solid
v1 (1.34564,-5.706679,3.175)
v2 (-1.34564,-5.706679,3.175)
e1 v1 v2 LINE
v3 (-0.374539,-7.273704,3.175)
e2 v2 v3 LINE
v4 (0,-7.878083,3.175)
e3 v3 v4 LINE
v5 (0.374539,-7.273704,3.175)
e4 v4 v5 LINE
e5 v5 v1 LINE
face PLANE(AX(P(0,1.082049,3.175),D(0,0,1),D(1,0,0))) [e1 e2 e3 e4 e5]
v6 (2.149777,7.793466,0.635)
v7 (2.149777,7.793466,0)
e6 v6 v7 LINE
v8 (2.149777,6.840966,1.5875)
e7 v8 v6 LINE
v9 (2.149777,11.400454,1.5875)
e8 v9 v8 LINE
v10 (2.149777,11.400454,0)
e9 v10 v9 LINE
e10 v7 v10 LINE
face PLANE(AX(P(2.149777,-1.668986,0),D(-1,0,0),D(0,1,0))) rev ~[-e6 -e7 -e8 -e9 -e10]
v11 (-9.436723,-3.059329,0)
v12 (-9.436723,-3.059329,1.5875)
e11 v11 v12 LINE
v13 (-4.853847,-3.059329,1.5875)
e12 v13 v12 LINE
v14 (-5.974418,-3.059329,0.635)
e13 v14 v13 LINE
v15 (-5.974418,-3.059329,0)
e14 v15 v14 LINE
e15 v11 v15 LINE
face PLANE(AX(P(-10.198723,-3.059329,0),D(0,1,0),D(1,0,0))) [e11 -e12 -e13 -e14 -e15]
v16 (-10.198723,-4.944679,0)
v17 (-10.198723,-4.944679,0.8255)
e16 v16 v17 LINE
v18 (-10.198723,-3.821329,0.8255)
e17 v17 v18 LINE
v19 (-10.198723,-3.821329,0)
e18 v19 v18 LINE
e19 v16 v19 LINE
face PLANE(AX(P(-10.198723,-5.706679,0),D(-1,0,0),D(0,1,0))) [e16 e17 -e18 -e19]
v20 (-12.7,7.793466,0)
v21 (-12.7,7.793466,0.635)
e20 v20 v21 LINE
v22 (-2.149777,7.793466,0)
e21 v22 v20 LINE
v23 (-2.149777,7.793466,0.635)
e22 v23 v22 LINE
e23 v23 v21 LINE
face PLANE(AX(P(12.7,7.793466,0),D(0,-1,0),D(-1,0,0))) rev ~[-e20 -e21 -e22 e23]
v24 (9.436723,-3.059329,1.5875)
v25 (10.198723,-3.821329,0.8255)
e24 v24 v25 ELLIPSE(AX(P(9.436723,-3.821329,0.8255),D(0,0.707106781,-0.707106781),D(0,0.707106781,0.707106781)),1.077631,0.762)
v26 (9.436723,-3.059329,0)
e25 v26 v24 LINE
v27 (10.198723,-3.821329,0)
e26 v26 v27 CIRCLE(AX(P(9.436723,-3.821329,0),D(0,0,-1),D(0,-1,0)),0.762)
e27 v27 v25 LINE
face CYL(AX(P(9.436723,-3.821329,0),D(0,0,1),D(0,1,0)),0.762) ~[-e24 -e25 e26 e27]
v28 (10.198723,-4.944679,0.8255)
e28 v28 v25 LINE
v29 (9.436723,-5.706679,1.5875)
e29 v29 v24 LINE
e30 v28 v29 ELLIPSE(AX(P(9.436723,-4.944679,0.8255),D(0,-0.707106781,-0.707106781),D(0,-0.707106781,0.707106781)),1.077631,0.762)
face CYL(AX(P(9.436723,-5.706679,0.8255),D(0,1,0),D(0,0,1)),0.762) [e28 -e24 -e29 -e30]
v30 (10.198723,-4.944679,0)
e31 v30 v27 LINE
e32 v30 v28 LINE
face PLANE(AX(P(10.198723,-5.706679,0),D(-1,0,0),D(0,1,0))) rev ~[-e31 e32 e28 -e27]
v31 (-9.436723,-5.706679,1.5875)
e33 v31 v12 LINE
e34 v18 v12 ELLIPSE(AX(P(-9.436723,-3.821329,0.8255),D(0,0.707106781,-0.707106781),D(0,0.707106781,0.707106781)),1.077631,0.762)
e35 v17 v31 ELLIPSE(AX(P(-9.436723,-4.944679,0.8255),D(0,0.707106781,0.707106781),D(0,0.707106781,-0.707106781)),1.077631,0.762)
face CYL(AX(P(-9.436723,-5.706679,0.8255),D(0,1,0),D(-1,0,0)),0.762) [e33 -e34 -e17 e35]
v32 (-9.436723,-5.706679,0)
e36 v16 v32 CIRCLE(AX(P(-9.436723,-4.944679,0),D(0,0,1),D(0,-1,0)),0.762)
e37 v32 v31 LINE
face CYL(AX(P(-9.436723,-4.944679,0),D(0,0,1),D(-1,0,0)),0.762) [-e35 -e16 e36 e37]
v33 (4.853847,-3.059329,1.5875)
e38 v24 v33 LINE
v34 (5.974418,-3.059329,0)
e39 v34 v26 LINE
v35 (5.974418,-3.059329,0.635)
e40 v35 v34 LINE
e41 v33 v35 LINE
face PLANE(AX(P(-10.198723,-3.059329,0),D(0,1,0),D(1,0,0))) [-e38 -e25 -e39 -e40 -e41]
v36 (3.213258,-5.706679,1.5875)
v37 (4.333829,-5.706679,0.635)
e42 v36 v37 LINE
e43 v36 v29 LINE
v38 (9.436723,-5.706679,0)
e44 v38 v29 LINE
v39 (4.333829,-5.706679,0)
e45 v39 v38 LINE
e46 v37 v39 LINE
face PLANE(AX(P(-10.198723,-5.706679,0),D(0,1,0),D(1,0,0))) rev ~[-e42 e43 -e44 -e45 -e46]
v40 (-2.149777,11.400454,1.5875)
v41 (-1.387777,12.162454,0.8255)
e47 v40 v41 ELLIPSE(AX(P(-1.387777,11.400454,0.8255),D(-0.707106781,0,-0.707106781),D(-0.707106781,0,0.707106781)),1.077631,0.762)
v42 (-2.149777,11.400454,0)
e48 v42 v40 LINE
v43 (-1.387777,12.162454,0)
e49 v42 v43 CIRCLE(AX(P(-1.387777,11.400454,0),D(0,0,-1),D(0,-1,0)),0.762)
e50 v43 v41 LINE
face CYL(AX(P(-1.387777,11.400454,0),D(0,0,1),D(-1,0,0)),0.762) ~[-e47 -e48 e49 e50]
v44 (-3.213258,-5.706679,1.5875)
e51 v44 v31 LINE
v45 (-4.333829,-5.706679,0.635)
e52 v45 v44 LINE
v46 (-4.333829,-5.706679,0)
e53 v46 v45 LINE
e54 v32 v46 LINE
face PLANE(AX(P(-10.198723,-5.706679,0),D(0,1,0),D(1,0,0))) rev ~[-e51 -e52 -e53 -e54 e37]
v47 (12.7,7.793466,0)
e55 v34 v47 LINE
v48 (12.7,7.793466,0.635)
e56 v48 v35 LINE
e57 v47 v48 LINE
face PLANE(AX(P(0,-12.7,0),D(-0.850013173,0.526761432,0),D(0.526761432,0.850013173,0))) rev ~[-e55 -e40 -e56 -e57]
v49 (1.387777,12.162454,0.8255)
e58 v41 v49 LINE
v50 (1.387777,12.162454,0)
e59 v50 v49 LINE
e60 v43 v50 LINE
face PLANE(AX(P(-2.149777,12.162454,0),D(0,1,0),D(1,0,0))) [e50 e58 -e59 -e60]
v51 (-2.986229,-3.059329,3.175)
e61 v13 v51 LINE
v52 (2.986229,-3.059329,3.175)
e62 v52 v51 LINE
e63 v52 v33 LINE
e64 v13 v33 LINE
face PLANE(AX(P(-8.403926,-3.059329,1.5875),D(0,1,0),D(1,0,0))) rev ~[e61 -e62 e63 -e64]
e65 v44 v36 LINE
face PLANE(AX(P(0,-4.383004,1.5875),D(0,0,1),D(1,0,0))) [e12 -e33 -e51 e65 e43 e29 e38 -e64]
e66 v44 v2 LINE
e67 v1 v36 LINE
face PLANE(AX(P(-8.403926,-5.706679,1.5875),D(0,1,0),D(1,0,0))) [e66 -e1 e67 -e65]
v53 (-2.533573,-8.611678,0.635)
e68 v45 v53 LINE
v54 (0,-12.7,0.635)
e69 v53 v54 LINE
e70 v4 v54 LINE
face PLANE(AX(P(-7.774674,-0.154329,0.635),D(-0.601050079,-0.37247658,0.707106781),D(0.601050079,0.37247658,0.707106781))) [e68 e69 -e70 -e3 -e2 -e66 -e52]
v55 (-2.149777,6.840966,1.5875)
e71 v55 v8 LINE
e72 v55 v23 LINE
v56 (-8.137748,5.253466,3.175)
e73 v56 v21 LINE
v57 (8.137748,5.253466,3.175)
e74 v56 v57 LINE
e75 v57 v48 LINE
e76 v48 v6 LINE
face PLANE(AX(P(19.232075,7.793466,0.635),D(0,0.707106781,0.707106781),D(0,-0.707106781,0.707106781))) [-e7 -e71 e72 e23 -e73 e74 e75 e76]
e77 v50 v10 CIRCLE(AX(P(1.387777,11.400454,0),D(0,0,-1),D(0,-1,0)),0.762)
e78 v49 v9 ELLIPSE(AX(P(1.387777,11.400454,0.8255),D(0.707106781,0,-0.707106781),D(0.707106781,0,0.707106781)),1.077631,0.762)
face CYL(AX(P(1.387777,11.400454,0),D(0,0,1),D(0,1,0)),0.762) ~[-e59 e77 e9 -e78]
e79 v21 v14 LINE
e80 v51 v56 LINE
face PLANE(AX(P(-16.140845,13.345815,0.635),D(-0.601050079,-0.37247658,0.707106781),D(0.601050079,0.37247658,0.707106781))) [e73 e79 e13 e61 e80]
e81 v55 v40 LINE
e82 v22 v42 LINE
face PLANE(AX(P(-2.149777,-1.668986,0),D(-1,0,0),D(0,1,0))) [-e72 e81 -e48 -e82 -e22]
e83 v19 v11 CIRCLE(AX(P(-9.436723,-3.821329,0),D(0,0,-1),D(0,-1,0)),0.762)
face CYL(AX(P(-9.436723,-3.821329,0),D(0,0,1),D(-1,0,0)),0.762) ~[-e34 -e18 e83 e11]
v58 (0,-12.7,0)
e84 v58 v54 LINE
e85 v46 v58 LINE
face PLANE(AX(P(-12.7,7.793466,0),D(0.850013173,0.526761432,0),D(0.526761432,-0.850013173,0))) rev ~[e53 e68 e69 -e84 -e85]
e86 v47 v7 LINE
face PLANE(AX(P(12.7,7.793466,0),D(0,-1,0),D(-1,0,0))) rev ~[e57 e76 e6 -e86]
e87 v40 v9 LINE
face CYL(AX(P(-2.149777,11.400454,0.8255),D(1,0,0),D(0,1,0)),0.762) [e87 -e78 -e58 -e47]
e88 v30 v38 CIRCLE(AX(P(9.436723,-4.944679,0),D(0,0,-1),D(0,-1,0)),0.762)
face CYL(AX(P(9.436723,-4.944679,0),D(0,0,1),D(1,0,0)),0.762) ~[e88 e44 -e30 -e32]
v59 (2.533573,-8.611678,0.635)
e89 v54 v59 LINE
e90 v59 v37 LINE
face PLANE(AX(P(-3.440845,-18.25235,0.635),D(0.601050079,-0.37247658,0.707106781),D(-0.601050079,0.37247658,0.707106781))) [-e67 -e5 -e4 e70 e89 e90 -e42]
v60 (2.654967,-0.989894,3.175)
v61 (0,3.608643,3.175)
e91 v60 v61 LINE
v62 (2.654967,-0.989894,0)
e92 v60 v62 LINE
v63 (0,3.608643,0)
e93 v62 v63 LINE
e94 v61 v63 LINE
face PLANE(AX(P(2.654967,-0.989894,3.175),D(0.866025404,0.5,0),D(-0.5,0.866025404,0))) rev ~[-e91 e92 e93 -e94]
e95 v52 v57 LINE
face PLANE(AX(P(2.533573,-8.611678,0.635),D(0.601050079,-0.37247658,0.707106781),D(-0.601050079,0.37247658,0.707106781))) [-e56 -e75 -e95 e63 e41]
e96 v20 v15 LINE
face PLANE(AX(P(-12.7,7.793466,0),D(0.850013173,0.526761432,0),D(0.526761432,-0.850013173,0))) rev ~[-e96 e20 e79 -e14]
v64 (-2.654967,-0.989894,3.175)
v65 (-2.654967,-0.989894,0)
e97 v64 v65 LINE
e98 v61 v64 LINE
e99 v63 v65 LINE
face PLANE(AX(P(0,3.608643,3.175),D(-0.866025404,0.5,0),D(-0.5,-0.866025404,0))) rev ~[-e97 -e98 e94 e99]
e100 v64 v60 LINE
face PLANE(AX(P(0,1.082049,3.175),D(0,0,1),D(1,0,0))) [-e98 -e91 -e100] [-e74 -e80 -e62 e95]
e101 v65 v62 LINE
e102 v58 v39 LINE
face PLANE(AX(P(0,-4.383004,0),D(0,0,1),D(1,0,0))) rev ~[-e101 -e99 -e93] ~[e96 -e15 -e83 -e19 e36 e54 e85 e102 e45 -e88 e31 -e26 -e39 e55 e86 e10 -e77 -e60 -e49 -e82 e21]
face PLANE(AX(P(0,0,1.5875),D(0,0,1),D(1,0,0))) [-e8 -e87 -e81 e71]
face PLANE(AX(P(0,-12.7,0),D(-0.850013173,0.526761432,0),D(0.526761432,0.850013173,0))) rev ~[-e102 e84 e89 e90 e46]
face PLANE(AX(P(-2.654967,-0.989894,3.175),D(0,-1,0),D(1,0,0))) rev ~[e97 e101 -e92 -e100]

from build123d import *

# Parameters (mm, degrees)
F1_DEPTH     = 3.175
F2_W         = 20.397445187
F2_H         = 2.647349927
F2_W_2       = 4.2995549738
F2_H_2       = 13.8314400401
F3_DEPTH     = 1.5875
F4_W         = 14.3783436368
F4_H         = 2.647349927
F5_DEPTH     = 25.4
F6_T4_DEPTH  = 25.8319450188
F6_T9_DEPTH  = 25.8319450188
F6_T14_DEPTH = 38.4641495789
F6_T19_DEPTH = 38.4641495789
F6_T24_DEPTH = 38.4641495789
F6_T29_DEPTH = 25.8319450188
F6_T34_DEPTH = 25.8319450188
F6_T39_DEPTH = 21.2914590052
F6_T44_DEPTH = 21.2914590052
F6_T49_DEPTH = 21.2914590052
F6_T54_DEPTH = 21.2914590052
F7_R         = 0.762
F9_DEPTH     = 25.4


# Not quite as in the source:
# - a fillet or chamfer that OpenCascade refuses, or shapes differently, is made with other operations: its cross-section is extruded or revolved along the edge and cut away or added


with BuildPart() as f1:
    # F0 (on Top) → F1 (new body)
    with BuildSketch(Plane.XY):
        Polygon((12.7, 7.7934656292), (-12.7, 7.7934656292), (0, -12.7), align=None)
    extrude(amount=F1_DEPTH)

    # F2 (on Top) → F3 (join)
    with BuildSketch(Plane.XY):
        with Locations((0, -4.3830036468)):
            Rectangle(F2_W, F2_H)
        with Locations((0, 5.2467339706)):
            Rectangle(F2_W_2, F2_H_2)
    extrude(amount=F3_DEPTH)

    # F4 (on face) → F5 (cut)
    with BuildSketch(Plane.XY.offset(1.5875)):
        with Locations((-1.2147540241, -4.3830036468)):
            Rectangle(F4_W, F4_H)
    extrude(amount=F5_DEPTH, mode=Mode.SUBTRACT)

    # F6: chamfer of 2.54 on 5 edges, made by hand


with BuildPart() as f6_tool2:
    # F6_s3 → F6_t4 (new body)
    with BuildSketch(Plane(origin=(-10.454367288, 16.8697808418, 0), x_dir=(0, 0, 1), z_dir=(0.5267614317, -0.8500131729, 0))):
        Polygon((0.635, 6.6898701827), (3.175, 4.1498701827), (3.175, 6.6898701827), align=None)
    extrude(amount=F6_T4_DEPTH)

    split(bisect_by=Plane.XZ.offset(3.0593286833), keep=Keep.BOTTOM)


with BuildPart() as f1_1:
    add(f1.part)

    # F6_t1: cut F6_tool2
    add(f6_tool2.part, mode=Mode.SUBTRACT)


with BuildPart() as f6_tool7:
    # F6_s8 → F6_t9 (new body)
    with BuildSketch(Plane(origin=(-10.454367288, 16.8697808418, 0), x_dir=(0, 0, 1), z_dir=(0.5267614317, -0.8500131729, 0))):
        Polygon((0.635, 6.6898701827), (3.175, 4.1498701827), (3.175, 6.6898701827), align=None)
    extrude(amount=F6_T9_DEPTH)

    split(bisect_by=Plane.XZ.offset(5.7066786103), keep=Keep.TOP)


with BuildPart() as f1_2:
    add(f1_1.part)

    # F6_t6: cut F6_tool7
    add(f6_tool7.part, mode=Mode.SUBTRACT)


with BuildPart() as f6_tool12:
    # F6_s13 → F6_t14 (new body)
    with BuildSketch(Plane.YZ.offset(19.2320747894)):
        Polygon((7.7934656292, 0.635), (5.2534656292, 3.175), (7.7934656292, 3.175), align=None)
    extrude(amount=-F6_T14_DEPTH)

    split(bisect_by=Plane.YZ.offset(2.1497774869), keep=Keep.TOP)


with BuildPart() as f1_3:
    add(f1_2.part)

    # F6_t11: cut F6_tool12
    add(f6_tool12.part, mode=Mode.SUBTRACT)


with BuildPart() as f6_tool17:
    # F6_s18 → F6_t19 (new body)
    with BuildSketch(Plane.YZ.offset(19.2320747894)):
        Polygon((7.7934656292, 0.635), (5.2534656292, 3.175), (7.7934656292, 3.175), align=None)
    extrude(amount=-F6_T19_DEPTH)

    split(bisect_by=Plane.XY.offset(1.5875), keep=Keep.TOP)


with BuildPart() as f1_4:
    add(f1_3.part)

    # F6_t16: cut F6_tool17
    add(f6_tool17.part, mode=Mode.SUBTRACT)


with BuildPart() as f6_tool22:
    # F6_s23 → F6_t24 (new body)
    with BuildSketch(Plane.YZ.offset(19.2320747894)):
        Polygon((7.7934656292, 0.635), (5.2534656292, 3.175), (7.7934656292, 3.175), align=None)
    extrude(amount=-F6_T24_DEPTH)

    split(bisect_by=Plane.YZ.offset(-2.1497774869), keep=Keep.BOTTOM)


with BuildPart() as f1_5:
    add(f1_4.part)

    # F6_t21: cut F6_tool22
    add(f6_tool22.part, mode=Mode.SUBTRACT)


with BuildPart() as f6_tool27:
    # F6_s28 → F6_t29 (new body)
    with BuildSketch(Plane(origin=(-3.1529050539, -5.0877127051, 0), x_dir=(0, 0, 1), z_dir=(0.5267614317, 0.8500131729, 0))):
        Polygon((0.635, 6.6898701827), (3.175, 4.1498701827), (3.175, 6.6898701827), align=None)
    extrude(amount=F6_T29_DEPTH)

    split(bisect_by=Plane.XZ.offset(5.7066786103), keep=Keep.TOP)


with BuildPart() as f1_6:
    add(f1_5.part)

    # F6_t26: cut F6_tool27
    add(f6_tool27.part, mode=Mode.SUBTRACT)


with BuildPart() as f6_tool32:
    # F6_s33 → F6_t34 (new body)
    with BuildSketch(Plane(origin=(-3.1529050539, -5.0877127051, 0), x_dir=(0, 0, 1), z_dir=(0.5267614317, 0.8500131729, 0))):
        Polygon((0.635, 6.6898701827), (3.175, 4.1498701827), (3.175, 6.6898701827), align=None)
    extrude(amount=F6_T34_DEPTH)

    split(bisect_by=Plane.XZ.offset(3.0593286833), keep=Keep.BOTTOM)


with BuildPart() as f1_7:
    add(f1_6.part)

    # F6_t31: cut F6_tool32
    add(f6_tool32.part, mode=Mode.SUBTRACT)


with BuildPart() as f6_tool37:
    # F6_s38 → F6_t39 (new body)
    with BuildSketch(Plane(origin=(-9.1273228482, -14.7283840218, 0), x_dir=(0, 0, 1), z_dir=(0.5267614317, 0.8500131729, 0))):
        Polygon((0.635, 6.6898701827), (3.175, 4.1498701827), (3.175, 6.6898701827), align=None)
    extrude(amount=F6_T39_DEPTH)

    split(bisect_by=Plane.XZ.offset(5.7066786103), keep=Keep.TOP)


with BuildPart() as f1_8:
    add(f1_7.part)

    # F6_t36: cut F6_tool37
    add(f6_tool37.part, mode=Mode.SUBTRACT)


with BuildPart() as f6_tool42:
    # F6_s43 → F6_t44 (new body)
    with BuildSketch(Plane(origin=(-9.1273228482, -14.7283840218, 0), x_dir=(0, 0, 1), z_dir=(0.5267614317, 0.8500131729, 0))):
        Polygon((0.635, 6.6898701827), (3.175, 4.1498701827), (3.175, 6.6898701827), align=None)
    extrude(amount=F6_T44_DEPTH)

    split(bisect_by=Plane.XZ.offset(3.0593286833), keep=Keep.BOTTOM)


with BuildPart() as f1_9:
    add(f1_8.part)

    # F6_t41: cut F6_tool42
    add(f6_tool42.part, mode=Mode.SUBTRACT)


with BuildPart() as f6_tool47:
    # F6_s48 → F6_t49 (new body)
    with BuildSketch(Plane(origin=(-2.0881965805, 3.3696366023, 0), x_dir=(0, 0, 1), z_dir=(0.5267614317, -0.8500131729, 0))):
        Polygon((0.635, 6.6898701827), (3.175, 4.1498701827), (3.175, 6.6898701827), align=None)
    extrude(amount=F6_T49_DEPTH)

    split(bisect_by=Plane.XZ.offset(3.0593286833), keep=Keep.BOTTOM)


with BuildPart() as f1_10:
    add(f1_9.part)

    # F6_t46: cut F6_tool47
    add(f6_tool47.part, mode=Mode.SUBTRACT)


with BuildPart() as f6_tool52:
    # F6_s53 → F6_t54 (new body)
    with BuildSketch(Plane(origin=(-2.0881965805, 3.3696366023, 0), x_dir=(0, 0, 1), z_dir=(0.5267614317, -0.8500131729, 0))):
        Polygon((0.635, 6.6898701827), (3.175, 4.1498701827), (3.175, 6.6898701827), align=None)
    extrude(amount=F6_T54_DEPTH)

    split(bisect_by=Plane.XZ.offset(5.7066786103), keep=Keep.TOP)


with BuildPart() as f1_11:
    add(f1_10.part)

    # F6_t51: cut F6_tool52
    add(f6_tool52.part, mode=Mode.SUBTRACT)

    # F7
    f7_edges = [f1_11.edges().sort_by_distance(p)[0] for p in [
        (-2.149777, 12.162454, 0.79375),
        (0, 12.162454, 1.5875),
        (2.149777, 12.162454, 0.79375),
        (-10.198723, -4.383004, 1.5875),
        (-10.198723, -5.706679, 0.79375),
        (-10.198723, -3.059329, 0.79375),
        (10.198723, -3.059329, 0.79375),
        (10.198723, -5.706679, 0.79375),
        (10.198723, -4.383004, 1.5875),
    ]]
    fillet(f7_edges, radius=F7_R)

    # F8 (on face) → F9 (cut)
    with BuildSketch(Plane.XY.offset(3.175)):
        Polygon((-2.6549665111, -0.989894278), (0, -0.989894278), (2.6549665111, -0.989894278), (0, 3.6086426117), align=None)
    extrude(amount=-F9_DEPTH, mode=Mode.SUBTRACT)


solid = f1_11.part
